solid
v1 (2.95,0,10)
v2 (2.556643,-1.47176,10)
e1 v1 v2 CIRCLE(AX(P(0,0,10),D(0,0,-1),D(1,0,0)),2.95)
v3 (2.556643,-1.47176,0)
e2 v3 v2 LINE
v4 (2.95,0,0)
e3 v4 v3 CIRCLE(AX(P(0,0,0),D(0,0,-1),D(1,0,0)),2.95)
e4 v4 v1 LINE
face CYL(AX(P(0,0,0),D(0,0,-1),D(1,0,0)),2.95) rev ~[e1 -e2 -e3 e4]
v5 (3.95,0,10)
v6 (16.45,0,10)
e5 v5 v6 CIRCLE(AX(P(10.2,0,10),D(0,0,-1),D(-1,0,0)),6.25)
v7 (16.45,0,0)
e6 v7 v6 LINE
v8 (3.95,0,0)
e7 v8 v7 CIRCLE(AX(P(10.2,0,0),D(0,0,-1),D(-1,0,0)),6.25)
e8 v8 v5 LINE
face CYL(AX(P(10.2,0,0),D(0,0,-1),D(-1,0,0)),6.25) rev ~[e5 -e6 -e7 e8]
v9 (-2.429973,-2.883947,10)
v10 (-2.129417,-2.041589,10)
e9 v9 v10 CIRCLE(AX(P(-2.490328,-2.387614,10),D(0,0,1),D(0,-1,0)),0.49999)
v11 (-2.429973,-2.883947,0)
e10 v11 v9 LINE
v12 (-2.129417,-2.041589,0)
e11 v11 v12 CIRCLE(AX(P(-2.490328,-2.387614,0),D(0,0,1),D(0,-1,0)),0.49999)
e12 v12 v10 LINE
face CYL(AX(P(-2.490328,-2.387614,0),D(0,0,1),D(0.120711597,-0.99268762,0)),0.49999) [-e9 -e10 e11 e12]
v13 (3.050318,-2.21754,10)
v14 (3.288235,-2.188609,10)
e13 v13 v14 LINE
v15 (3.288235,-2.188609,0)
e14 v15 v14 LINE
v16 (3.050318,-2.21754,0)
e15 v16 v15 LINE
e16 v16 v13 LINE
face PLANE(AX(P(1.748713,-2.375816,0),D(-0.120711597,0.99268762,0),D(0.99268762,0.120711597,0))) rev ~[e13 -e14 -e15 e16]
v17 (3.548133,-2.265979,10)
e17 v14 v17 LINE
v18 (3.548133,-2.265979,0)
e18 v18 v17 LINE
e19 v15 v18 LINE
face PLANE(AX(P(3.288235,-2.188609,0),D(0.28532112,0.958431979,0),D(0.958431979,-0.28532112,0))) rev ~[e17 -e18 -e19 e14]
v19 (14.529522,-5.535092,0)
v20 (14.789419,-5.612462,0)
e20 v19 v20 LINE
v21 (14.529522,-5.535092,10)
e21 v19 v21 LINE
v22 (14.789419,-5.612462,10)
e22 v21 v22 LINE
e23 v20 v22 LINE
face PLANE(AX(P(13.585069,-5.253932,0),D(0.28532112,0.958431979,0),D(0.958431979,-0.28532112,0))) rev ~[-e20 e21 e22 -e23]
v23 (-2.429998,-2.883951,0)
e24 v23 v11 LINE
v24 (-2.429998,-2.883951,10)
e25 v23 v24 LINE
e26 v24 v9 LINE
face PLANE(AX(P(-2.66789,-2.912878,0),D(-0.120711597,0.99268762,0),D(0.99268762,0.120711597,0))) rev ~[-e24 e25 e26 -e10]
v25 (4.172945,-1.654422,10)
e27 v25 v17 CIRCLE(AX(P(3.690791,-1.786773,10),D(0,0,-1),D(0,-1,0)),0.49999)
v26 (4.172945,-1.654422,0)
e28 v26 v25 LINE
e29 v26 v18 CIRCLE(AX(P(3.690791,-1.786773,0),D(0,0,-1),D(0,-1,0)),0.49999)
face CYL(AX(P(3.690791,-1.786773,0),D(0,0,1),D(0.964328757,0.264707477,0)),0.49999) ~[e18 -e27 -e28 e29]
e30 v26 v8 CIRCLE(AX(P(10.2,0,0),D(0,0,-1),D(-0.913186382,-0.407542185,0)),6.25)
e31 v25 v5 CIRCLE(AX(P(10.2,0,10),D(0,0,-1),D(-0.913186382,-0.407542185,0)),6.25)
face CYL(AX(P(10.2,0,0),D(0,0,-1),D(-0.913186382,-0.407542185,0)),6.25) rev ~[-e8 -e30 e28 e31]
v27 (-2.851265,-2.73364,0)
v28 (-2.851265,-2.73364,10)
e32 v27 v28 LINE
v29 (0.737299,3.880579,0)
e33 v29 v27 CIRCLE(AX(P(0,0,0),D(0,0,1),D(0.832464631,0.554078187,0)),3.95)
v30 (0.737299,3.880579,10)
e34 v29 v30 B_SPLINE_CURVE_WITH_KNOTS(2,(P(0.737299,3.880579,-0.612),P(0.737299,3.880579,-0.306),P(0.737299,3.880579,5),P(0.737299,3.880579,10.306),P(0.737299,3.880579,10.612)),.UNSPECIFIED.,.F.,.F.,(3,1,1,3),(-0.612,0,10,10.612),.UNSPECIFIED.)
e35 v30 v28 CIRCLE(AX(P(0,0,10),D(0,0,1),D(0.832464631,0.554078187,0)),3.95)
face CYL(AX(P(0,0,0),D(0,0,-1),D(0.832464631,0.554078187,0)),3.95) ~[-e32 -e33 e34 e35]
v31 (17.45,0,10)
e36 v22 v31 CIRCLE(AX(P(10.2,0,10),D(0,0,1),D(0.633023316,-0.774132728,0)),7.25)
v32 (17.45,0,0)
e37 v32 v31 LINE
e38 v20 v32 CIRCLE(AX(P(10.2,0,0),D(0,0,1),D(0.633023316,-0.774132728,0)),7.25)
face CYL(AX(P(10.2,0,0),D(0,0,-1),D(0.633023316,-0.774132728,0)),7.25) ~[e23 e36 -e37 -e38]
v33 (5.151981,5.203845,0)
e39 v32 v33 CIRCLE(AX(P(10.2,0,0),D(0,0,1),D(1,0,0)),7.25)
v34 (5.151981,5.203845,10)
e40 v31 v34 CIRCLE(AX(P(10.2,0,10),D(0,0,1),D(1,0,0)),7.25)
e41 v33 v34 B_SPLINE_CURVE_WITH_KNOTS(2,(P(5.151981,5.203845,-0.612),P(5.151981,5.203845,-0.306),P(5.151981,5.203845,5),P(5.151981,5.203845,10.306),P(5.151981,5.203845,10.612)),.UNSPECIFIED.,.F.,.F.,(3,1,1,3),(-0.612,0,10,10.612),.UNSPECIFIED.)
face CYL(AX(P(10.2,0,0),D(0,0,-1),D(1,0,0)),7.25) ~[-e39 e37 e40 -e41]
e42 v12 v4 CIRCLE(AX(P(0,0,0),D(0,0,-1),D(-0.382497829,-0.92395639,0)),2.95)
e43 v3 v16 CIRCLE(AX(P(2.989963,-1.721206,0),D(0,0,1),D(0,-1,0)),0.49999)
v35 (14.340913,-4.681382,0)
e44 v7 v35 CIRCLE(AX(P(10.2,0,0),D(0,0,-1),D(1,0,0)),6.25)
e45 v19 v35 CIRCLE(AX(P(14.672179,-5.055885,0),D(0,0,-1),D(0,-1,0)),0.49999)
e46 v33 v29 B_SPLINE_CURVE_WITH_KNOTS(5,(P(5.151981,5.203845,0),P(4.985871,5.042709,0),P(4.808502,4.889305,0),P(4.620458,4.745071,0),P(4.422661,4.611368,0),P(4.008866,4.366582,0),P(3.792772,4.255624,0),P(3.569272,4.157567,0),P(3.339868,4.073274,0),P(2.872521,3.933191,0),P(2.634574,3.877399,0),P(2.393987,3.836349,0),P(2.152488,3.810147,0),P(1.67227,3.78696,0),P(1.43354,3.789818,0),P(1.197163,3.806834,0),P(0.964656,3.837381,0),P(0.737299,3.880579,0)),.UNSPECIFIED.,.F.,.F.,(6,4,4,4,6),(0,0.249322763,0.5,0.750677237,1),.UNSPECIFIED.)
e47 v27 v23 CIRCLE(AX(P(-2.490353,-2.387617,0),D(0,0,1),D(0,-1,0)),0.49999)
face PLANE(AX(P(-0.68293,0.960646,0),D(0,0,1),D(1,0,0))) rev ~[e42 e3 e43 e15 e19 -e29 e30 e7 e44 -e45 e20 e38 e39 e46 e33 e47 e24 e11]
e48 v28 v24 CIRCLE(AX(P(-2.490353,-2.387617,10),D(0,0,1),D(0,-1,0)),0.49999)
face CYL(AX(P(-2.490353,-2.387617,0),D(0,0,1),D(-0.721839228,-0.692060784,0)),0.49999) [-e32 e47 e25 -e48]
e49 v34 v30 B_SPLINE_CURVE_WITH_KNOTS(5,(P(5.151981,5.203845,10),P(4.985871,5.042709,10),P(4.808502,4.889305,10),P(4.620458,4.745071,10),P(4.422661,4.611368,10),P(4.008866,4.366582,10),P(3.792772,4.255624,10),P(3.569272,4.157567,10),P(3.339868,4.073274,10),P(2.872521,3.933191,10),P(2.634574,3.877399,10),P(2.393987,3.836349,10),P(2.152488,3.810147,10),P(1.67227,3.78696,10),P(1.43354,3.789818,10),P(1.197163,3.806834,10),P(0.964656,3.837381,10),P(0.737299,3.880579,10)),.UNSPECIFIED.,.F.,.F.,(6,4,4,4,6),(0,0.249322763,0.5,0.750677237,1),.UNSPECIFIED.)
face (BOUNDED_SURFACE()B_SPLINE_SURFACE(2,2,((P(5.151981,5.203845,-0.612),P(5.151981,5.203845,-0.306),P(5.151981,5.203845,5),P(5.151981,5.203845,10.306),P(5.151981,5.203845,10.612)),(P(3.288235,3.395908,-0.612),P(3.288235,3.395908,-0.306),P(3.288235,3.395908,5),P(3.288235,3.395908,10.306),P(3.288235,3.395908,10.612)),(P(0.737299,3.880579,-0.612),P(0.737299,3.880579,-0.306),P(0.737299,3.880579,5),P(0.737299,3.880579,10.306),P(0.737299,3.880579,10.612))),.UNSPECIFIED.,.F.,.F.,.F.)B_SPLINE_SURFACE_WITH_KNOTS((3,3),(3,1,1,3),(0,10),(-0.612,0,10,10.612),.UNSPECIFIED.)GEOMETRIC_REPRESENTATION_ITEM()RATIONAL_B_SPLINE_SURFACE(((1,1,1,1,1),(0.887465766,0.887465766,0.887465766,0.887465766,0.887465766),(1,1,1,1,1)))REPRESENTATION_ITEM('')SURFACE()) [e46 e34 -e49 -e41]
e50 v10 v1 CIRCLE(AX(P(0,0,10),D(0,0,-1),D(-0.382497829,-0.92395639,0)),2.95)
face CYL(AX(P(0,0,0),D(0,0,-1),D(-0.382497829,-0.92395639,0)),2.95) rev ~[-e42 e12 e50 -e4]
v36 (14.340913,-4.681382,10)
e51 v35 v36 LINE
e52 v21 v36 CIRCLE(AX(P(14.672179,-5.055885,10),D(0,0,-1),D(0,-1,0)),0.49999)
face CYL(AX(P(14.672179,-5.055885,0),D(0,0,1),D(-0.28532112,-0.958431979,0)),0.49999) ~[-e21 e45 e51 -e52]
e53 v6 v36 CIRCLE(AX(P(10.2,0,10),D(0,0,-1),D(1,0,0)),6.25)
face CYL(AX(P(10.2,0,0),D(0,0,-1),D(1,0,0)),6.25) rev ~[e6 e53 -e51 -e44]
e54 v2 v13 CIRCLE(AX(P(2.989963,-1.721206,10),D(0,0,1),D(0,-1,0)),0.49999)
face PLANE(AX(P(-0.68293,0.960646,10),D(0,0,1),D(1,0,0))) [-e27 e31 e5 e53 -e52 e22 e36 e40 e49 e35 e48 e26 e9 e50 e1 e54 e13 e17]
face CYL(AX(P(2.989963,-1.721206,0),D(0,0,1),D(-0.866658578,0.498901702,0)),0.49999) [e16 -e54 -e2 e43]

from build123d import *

# Parameters (mm, degrees)
F1_DEPTH = 10
F2_R     = 5
F3_R     = 0.49999


# Not quite as in the source:
# - a fillet or chamfer is up to 0.001 mm smaller than in the source, because OpenCascade refuses the exact size


with BuildPart() as f1:
    # F0 (on Top) → F1 (new body)
    with BuildSketch(Plane.XY):
        with BuildLine():
            ThreePointArc((-1.1283685941, -2.7256713514), (-1.6391785515, 2.4526707232), (2.95, 0))
            ThreePointArc((2.95, 0), (3.035057777, 1.107295327), (3.2882352941, 2.1886088391))
            ThreePointArc((3.2882352941, 2.1886088391), (-2.5695330315, 3), (-2.6678904245, -2.9128784188))
            Line((-2.6678904245, -2.9128784188), (-1.1283685941, -2.7256713514))
        make_face()
        with BuildLine():
            ThreePointArc((3.2882352941, 2.1886088391), (3.035057777, 1.107295327), (2.95, 0))
            ThreePointArc((2.95, 0), (3.035057777, -1.107295327), (3.2882352941, -2.1886088391))
            ThreePointArc((3.2882352941, -2.1886088391), (3.7809409815, -1.1432345753), (3.95, 0))
            ThreePointArc((3.95, 0), (3.7809409815, 1.1432345753), (3.2882352941, 2.1886088391))
        make_face()
        with BuildLine():
            ThreePointArc((3.2882352941, -2.1886088391), (3.035057777, -1.107295327), (2.95, 0))
            ThreePointArc((2.95, 0), (2.6326037224, -1.3311264557), (1.7487134637, -2.3758159065))
            Line((1.7487134637, -2.3758159065), (3.2882352941, -2.1886088391))
        make_face()
        with BuildLine():
            ThreePointArc((3.95, 0), (3.7809409815, -1.1432345753), (3.2882352941, -2.1886088391))
            Line((3.2882352941, -2.1886088391), (4.4925851142, -2.5471386536))
            ThreePointArc((4.4925851142, -2.5471386536), (4.0871511128, -1.3021438023), (3.95, 0))
        make_face()
        with BuildLine():
            ThreePointArc((17.45, 0), (11.307295327, 7.164942223), (3.2882352941, 2.1886088391))
            ThreePointArc((3.2882352941, 2.1886088391), (3.7809409815, 1.1432345753), (3.95, 0))
            ThreePointArc((3.95, 0), (10.2, 6.25), (16.45, 0))
            ThreePointArc((16.45, 0), (15.6872207282, -2.9921411532), (13.5850692222, -5.2539324663))
            Line((13.5850692222, -5.2539324663), (14.7894190423, -5.6124622809))
            ThreePointArc((14.7894190423, -5.6124622809), (16.7511750113, -3.1055765925), (17.45, 0))
        make_face()
    extrude(amount=F1_DEPTH)

    # F2
    f2_edges = [f1.edges().sort_by_distance(p)[0] for p in [
        (3.288235, 2.188609, 5),
    ]]
    fillet(f2_edges, radius=F2_R)

    # F3 (radius 0.5 in the source; OpenCascade refuses exactly that, so slightly less here)
    f3_edges = [f1.edges().sort_by_distance(p)[0] for p in [
        (-1.128369, -2.725671, 5),
        (1.748713, -2.375816, 5),
        (4.492585, -2.547139, 5),
        (13.585069, -5.253932, 5),
        (-2.66789, -2.912878, 5),
    ]]
    fillet(f3_edges, radius=F3_R)


solid = f1.part
